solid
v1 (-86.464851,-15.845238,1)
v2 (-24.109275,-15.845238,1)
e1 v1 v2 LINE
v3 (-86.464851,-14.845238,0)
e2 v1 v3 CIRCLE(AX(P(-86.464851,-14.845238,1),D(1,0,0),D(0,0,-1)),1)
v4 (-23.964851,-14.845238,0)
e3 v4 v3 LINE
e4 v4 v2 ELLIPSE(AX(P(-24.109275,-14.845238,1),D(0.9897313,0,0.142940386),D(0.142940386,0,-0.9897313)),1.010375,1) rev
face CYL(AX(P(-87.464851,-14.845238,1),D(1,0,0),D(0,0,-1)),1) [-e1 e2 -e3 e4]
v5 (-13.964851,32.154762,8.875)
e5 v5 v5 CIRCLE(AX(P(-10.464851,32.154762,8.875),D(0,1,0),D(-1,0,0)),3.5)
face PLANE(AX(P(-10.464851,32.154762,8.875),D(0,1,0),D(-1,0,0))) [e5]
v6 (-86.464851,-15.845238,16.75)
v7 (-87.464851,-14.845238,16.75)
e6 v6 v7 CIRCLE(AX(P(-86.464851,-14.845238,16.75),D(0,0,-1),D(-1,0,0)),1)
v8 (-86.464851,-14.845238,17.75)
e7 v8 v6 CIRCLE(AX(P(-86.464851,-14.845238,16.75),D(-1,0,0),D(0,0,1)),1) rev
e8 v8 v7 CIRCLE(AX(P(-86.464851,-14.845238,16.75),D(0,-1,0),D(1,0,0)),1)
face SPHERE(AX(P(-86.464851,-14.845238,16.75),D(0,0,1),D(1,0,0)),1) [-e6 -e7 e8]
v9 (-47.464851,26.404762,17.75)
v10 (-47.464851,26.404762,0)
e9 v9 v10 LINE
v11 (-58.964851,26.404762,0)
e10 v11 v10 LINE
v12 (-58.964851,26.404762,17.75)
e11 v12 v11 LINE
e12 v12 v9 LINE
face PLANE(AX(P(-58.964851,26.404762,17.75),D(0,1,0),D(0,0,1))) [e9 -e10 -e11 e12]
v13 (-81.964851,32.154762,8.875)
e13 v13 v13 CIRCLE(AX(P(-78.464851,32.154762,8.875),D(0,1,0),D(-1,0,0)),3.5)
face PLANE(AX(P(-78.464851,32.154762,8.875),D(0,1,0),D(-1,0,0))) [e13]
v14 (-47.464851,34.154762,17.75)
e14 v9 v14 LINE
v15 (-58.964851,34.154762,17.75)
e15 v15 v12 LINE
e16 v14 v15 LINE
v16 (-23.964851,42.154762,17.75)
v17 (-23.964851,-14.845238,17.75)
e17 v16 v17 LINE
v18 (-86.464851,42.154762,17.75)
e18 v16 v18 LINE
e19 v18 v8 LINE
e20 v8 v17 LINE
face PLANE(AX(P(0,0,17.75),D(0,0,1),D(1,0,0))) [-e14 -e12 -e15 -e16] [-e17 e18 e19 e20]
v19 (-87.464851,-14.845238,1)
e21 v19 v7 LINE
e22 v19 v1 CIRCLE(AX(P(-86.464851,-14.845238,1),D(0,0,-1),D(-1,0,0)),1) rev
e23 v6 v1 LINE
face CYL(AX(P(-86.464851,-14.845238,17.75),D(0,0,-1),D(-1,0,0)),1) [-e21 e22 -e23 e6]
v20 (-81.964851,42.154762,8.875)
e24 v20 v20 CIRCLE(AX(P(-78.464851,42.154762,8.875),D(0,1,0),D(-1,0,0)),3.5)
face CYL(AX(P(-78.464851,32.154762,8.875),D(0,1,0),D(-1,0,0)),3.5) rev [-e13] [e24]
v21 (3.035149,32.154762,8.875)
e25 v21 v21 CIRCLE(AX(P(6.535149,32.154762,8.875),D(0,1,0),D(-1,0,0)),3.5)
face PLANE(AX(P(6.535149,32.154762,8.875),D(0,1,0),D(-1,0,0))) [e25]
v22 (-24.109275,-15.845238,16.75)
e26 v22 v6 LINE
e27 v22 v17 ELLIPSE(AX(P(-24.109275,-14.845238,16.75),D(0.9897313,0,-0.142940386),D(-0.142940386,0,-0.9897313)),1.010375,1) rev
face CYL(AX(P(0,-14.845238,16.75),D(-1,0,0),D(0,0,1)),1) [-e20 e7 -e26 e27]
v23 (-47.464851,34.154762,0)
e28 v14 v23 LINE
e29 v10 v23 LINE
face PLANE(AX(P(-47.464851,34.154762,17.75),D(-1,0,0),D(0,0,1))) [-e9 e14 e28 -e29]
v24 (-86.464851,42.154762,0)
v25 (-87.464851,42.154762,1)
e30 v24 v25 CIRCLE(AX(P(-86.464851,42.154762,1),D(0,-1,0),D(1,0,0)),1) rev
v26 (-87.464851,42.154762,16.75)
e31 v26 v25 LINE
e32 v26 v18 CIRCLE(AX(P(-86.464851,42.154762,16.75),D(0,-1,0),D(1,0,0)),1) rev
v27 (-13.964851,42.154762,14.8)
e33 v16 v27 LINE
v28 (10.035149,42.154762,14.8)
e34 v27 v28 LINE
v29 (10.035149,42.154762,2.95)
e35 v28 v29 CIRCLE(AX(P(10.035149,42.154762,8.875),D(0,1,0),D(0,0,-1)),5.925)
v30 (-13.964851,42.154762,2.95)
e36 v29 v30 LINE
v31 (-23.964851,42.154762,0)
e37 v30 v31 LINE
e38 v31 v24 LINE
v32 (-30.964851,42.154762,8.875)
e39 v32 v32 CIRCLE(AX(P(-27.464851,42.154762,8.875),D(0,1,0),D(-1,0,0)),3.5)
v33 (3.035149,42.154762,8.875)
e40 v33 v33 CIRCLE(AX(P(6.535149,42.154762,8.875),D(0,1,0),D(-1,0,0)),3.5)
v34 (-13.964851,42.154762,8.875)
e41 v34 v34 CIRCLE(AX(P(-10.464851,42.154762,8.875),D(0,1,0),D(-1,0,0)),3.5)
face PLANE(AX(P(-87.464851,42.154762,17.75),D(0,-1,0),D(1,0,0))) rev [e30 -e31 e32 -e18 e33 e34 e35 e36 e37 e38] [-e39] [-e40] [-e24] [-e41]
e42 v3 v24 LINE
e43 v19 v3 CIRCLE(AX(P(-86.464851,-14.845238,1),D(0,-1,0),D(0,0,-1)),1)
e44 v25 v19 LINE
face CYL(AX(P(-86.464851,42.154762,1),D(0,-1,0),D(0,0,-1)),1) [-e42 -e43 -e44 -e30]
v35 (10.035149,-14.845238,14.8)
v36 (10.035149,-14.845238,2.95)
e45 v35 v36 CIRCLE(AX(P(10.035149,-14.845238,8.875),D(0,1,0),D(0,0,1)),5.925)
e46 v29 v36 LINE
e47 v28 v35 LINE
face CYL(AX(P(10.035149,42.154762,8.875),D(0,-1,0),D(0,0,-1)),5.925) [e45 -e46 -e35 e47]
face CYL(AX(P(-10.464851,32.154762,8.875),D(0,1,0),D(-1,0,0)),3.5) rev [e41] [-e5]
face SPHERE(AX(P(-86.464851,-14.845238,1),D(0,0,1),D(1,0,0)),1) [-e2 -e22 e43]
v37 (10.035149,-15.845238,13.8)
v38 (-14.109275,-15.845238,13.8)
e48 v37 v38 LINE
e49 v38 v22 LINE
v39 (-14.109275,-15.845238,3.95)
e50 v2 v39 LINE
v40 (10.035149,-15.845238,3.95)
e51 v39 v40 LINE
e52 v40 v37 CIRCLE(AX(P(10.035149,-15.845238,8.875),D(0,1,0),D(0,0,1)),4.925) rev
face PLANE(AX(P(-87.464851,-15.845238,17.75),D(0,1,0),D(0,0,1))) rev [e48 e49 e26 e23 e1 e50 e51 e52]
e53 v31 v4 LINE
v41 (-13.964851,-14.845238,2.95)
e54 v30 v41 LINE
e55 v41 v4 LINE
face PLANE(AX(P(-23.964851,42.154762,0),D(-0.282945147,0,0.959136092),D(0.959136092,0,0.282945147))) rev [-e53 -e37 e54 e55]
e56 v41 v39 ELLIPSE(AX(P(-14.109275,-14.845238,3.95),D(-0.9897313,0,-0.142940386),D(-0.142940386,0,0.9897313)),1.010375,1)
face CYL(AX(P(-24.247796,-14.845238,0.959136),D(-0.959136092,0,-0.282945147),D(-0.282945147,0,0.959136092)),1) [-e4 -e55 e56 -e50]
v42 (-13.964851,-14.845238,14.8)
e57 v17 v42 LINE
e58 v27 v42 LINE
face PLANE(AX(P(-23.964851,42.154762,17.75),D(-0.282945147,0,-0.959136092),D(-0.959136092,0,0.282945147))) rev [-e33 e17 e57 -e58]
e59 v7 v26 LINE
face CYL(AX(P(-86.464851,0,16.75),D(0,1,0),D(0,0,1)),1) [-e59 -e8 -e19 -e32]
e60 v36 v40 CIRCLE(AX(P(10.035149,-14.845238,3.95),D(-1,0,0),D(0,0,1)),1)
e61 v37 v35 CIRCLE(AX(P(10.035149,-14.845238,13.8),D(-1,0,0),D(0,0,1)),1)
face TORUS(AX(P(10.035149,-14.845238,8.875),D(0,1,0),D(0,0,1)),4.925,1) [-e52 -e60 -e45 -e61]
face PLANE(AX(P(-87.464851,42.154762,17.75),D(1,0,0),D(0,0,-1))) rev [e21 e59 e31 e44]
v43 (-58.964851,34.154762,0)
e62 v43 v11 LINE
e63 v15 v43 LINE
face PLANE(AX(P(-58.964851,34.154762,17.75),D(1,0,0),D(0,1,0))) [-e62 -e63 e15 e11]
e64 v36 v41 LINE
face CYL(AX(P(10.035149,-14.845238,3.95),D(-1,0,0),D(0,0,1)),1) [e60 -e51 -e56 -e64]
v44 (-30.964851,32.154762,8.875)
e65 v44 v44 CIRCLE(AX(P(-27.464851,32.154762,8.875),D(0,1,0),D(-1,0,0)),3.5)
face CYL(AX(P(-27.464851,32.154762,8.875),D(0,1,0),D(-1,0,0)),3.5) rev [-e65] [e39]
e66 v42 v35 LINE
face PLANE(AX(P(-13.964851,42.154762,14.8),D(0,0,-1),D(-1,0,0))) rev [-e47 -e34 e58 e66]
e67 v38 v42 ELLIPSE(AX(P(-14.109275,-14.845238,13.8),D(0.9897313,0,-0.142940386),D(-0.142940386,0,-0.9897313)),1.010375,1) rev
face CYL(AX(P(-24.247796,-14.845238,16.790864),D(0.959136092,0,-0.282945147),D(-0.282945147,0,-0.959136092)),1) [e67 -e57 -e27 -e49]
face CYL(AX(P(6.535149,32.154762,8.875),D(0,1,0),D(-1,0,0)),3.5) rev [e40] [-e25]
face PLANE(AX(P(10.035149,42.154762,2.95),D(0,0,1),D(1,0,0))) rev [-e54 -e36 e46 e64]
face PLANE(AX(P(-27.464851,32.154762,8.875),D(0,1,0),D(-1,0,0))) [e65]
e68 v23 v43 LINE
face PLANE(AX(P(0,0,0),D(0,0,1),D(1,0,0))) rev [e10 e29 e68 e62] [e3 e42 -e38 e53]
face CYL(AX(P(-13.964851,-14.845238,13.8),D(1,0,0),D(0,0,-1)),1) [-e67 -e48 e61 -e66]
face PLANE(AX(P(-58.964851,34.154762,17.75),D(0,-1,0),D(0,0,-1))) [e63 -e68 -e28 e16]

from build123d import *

# Parameters (mm, degrees)
SKETCH1_W                            = 104
SKETCH1_H                            = 58
SKETCH1_W_2                          = 11.5
SKETCH1_H_2                          = 7.75
MODULAR_MAIN_BODY_DEPTH              = 17.75
FRONT_CUT_OUT_DEPTH                  = 107.43853951
SKETCH5_R                            = 3.5
MODULAR_INTERFACE_DEEP_CUT_OUT_DEPTH = 10
FILLET1_R                            = 1
FILLET3_R                            = 1


with BuildPart() as part:
    # Sketch1 → modular_main_body (new body)
    with BuildSketch(Plane.XY):
        with Locations((-35.464851186, 13.154761905)):
            Rectangle(SKETCH1_W, SKETCH1_H)
        with Locations((-53.214851186, 30.279761905)):
            Rectangle(SKETCH1_W_2, SKETCH1_H_2, mode=Mode.SUBTRACT)
    extrude(amount=MODULAR_MAIN_BODY_DEPTH)

    # Sketch2 → front_cut_out (cut, through all)
    with BuildSketch(Plane.XZ.offset(15.845238095)):
        with BuildLine():
            Line((-23.964851186, 17.75), (-13.964851186, 14.8))
            Line((-13.964851186, 14.8), (10.035148814, 14.8))
            ThreePointArc((10.035148814, 14.8), (15.960148814, 8.875), (10.035148814, 2.95))
            Line((10.035148814, 2.95), (-13.964851186, 2.95))
            Line((-13.964851186, 2.95), (-23.964851186, 0))
            Line((-23.964851186, 0), (16.535148814, 0))
            Line((16.535148814, 0), (16.535148814, 17.75))
            Line((16.535148814, 17.75), (-23.964851186, 17.75))
        make_face()
    extrude(amount=-FRONT_CUT_OUT_DEPTH, mode=Mode.SUBTRACT)

    # Sketch5 → modular_interface_deep_cut_out (cut)
    with BuildSketch(Plane(origin=(0, 42.154761905, 0), x_dir=(1, 0, 0), z_dir=(0, 1, 0))):
        with Locations(Location((-78.464851186, -8.875, 0), (0, 0, 180))):
            Circle(SKETCH5_R)
        with Locations(Location((-27.464851186, -8.875, 0), (0, 0, 180))):
            Circle(SKETCH5_R)
        with Locations(Location((-10.464851186, -8.875, 0), (0, 0, 180))):
            Circle(SKETCH5_R)
        with Locations(Location((6.535148814, -8.875, 0), (0, 0, 180))):
            Circle(SKETCH5_R)
    extrude(amount=-MODULAR_INTERFACE_DEEP_CUT_OUT_DEPTH, mode=Mode.SUBTRACT)

    # Fillet1
    fillet1_edges = [part.edges().sort_by_distance(p)[0] for p in [
        (-18.964851186, -15.845238095, 16.275),
        (-1.964851186, -15.845238095, 14.8),
        (15.960148814, -15.845238095, 8.875),
        (-1.964851186, -15.845238095, 2.95),
        (-18.964851186, -15.845238095, 1.475),
        (-55.714851186, -15.845238095, 0),
        (-55.714851186, -15.845238095, 17.75),
        (-87.464851186, -15.845238095, 8.875),
    ]]
    fillet(fillet1_edges, radius=FILLET1_R)

    # Fillet3
    # the kernel refuses this fillet: 1 mm, written as the material it takes off along each edge
    with BuildSketch(Plane(origin=(-86.464851186, -14.845238095, 16.75), x_dir=(0, 0, 1), z_dir=(-1, 0, 0))) as fillet3_piece_1_section:
        Polygon((0, 0), (FILLET3_R, 0), (FILLET3_R, -FILLET3_R), (0, -FILLET3_R), align=None)
    fillet3_piece_1 = extrude(amount=FILLET3_R, mode=Mode.PRIVATE)
    fillet3_piece_1 = fillet3_piece_1 - Plane(origin=(-86.464851186, -14.845238095, 16.75), x_dir=(0, 0.7071067811865475, -0.7071067811865475), z_dir=(-1, 0, 0)) * Sphere(FILLET3_R, mode=Mode.PRIVATE)
    add(fillet3_piece_1, mode=Mode.SUBTRACT)
    with BuildSketch(Plane(origin=(-86.464851186, -14.845238095, 1), x_dir=(-1, 0, 0), z_dir=(0, 0, -1))) as fillet3_piece_2_section:
        Polygon((0, 0), (FILLET3_R, 0), (FILLET3_R, -FILLET3_R), (0, -FILLET3_R), align=None)
    fillet3_piece_2 = extrude(amount=FILLET3_R, mode=Mode.PRIVATE)
    fillet3_piece_2 = fillet3_piece_2 - Plane(origin=(-86.464851186, -14.845238095, 1), x_dir=(0.7071067811865475, 0.7071067811865475, 0), z_dir=(0, 0, -1)) * Sphere(FILLET3_R, mode=Mode.PRIVATE)
    add(fillet3_piece_2, mode=Mode.SUBTRACT)
    with BuildSketch(Plane(origin=(-87.464851186, -14.845238095, 17.75), x_dir=(0, 0, -1), z_dir=(0, 1, 0)), Plane(origin=(-87.464851186, -14.845238095, 0), x_dir=(1, 0, 0), z_dir=(0, 1, 0))) as fillet3_piece_3:
        with BuildLine():
            CenterArc((FILLET3_R, -FILLET3_R), FILLET3_R, 90, 90)
            Line((0, -FILLET3_R), (0, 0))
            Line((0, 0), (FILLET3_R, 0))
        make_face()
    extrude(amount=59.5, mode=Mode.SUBTRACT)


solid = part.part
